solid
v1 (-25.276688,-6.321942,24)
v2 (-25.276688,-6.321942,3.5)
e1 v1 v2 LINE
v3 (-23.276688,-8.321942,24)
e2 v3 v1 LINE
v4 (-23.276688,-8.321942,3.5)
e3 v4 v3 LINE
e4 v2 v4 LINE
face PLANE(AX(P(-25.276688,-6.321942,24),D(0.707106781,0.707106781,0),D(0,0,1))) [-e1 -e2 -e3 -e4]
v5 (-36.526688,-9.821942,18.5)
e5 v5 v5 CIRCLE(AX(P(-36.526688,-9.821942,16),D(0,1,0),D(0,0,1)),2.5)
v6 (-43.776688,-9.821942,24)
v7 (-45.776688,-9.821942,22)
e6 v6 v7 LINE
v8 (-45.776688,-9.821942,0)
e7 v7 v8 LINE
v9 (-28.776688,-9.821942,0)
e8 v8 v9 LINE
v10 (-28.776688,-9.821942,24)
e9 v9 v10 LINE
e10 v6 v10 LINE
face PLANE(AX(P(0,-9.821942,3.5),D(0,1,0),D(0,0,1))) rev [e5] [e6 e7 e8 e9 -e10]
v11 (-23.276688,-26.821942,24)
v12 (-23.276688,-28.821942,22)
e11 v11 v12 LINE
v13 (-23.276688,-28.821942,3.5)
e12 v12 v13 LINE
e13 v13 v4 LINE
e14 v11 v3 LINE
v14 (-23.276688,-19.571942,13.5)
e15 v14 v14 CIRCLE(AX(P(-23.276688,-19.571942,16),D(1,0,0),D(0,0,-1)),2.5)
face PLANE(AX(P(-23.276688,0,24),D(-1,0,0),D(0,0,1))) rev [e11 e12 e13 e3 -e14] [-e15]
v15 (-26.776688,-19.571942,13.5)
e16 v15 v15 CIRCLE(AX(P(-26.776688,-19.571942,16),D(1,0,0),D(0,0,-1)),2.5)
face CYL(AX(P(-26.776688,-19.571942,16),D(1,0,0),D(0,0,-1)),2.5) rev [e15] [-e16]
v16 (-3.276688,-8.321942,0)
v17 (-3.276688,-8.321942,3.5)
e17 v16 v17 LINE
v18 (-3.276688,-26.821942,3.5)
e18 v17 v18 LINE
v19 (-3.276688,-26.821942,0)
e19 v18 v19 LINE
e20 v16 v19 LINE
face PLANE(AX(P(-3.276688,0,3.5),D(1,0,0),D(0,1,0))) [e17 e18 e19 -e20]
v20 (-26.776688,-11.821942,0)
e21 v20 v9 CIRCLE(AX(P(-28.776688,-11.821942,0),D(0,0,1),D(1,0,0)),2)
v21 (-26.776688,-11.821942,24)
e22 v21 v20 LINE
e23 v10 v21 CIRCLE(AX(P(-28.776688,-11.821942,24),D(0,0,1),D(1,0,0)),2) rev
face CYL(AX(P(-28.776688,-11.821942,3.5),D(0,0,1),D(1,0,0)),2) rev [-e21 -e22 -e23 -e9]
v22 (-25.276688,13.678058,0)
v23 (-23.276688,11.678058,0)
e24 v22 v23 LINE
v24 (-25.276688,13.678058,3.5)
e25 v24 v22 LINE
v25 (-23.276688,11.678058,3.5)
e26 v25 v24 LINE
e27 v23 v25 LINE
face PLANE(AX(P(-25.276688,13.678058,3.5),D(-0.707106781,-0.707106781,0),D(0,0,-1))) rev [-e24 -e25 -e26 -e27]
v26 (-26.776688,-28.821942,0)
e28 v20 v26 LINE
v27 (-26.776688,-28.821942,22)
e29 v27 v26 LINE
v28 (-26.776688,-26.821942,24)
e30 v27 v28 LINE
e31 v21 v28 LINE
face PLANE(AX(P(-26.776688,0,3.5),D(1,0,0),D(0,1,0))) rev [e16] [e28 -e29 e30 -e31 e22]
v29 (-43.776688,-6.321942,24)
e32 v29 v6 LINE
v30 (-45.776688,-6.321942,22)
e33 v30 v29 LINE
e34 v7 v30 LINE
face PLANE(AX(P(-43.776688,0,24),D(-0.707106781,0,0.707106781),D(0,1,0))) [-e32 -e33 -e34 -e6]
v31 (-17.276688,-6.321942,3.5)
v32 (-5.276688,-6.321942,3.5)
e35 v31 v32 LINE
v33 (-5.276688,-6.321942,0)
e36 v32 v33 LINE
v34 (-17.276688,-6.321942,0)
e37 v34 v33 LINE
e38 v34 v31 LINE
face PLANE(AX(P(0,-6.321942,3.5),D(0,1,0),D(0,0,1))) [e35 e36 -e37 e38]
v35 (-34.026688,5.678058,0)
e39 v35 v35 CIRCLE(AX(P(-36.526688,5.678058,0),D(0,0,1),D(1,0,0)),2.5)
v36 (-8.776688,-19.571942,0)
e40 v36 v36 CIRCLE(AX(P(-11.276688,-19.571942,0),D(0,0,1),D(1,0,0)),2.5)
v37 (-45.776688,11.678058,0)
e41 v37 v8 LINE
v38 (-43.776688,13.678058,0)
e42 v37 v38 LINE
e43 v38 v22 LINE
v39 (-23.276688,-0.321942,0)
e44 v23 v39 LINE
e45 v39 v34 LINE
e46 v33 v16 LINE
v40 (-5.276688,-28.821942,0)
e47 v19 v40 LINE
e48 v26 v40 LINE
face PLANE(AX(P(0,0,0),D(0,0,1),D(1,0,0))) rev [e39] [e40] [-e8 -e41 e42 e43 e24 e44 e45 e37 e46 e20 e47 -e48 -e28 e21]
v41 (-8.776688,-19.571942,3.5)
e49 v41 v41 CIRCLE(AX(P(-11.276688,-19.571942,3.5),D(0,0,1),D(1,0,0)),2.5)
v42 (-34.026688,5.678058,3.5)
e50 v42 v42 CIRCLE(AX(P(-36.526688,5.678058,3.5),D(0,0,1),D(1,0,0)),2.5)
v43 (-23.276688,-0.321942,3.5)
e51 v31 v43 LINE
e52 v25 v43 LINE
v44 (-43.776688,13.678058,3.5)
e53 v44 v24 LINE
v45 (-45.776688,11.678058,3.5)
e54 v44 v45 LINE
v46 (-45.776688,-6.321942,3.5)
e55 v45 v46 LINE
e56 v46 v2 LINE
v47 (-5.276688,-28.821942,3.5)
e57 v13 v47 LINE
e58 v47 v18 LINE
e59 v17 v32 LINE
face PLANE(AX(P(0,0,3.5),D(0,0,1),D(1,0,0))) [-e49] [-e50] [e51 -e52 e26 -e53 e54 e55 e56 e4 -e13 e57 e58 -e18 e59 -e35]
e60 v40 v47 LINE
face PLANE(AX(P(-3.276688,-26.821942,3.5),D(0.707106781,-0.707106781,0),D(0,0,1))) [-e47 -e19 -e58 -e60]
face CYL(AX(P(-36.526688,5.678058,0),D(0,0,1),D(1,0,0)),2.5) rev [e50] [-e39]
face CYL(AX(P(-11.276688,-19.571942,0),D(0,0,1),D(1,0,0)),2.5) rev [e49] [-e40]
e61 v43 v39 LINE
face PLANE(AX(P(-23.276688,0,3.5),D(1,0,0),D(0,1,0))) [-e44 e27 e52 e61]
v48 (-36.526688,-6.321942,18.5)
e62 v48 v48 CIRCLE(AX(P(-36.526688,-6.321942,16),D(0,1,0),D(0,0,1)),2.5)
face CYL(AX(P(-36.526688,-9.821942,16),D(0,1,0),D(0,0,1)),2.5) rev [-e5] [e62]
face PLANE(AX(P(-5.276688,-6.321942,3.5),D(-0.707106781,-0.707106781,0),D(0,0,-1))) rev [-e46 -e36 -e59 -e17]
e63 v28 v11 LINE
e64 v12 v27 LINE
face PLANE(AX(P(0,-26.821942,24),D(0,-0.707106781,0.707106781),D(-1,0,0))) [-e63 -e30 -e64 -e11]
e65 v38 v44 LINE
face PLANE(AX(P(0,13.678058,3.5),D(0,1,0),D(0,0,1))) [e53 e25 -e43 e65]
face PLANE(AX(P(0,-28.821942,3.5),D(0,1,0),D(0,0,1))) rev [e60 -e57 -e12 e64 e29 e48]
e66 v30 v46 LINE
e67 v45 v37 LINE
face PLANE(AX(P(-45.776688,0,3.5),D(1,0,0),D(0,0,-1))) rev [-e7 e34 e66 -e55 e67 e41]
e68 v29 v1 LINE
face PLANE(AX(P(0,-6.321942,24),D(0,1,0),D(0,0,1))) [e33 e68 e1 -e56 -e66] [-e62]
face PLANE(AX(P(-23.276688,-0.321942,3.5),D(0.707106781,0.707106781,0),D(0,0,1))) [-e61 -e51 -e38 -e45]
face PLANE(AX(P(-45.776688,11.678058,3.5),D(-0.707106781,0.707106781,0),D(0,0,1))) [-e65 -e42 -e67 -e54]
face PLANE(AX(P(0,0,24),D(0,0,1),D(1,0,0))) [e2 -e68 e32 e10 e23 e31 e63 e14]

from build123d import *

# Parameters (mm, degrees)
ESQUISSE1_W             = 3.5
ESQUISSE1_H             = 3.5
BOSS_EXTRU_1_DEPTH      = 3.5
ESQUISSE2_W             = 19
ESQUISSE2_H             = 3.5
ESQUISSE2_W_2           = 3.5
ESQUISSE2_H_2           = 19
BOSS_EXTRU_2_DEPTH      = 20.5
ESQUISSE3_R             = 2.5
ENL_V_MAT_EXTRU_2_DEPTH = 3.5
ESQUISSE4_R             = 2.5
ENL_V_MAT_EXTRU_3_DEPTH = 3.5
ESQUISSE5_R             = 2.5
ENL_V_MAT_EXTRU_4_DEPTH = 3.5
ESQUISSE6_R             = 2.5
ENL_V_MAT_EXTRU_5_DEPTH = 3.5
CHANFREIN1_SIZE         = 6
CHANFREIN2_SIZE         = 2
CHANFREIN3_SIZE         = 2
CONG_1_R                = 2


with BuildPart() as part:
    # Esquisse1 → Boss.-Extru.1 (new body)
    with BuildSketch(Plane.XY):
        Polygon((-23.276688067, 13.678057554), (-45.776688067, 13.678057554), (-45.776688067, -9.821942446), (-26.776688067, -9.821942446), (-26.776688067, -6.321942446), (-23.276688067, -6.321942446), align=None)
        with Locations((-25.026688067, -8.071942446)):
            Rectangle(ESQUISSE1_W, ESQUISSE1_H)
        Polygon((-3.276688067, -6.321942446), (-23.276688067, -6.321942446), (-23.276688067, -9.821942446), (-26.776688067, -9.821942446), (-26.776688067, -28.821942446), (-3.276688067, -28.821942446), align=None)
    extrude(amount=BOSS_EXTRU_1_DEPTH)

    # Esquisse2 → Boss.-Extru.2 (add)
    with BuildSketch(Plane.XY.offset(3.5)):
        with Locations((-36.276688067, -8.071942446)):
            Rectangle(ESQUISSE2_W, ESQUISSE2_H)
        with Locations((-25.026688067, -8.071942446)):
            Rectangle(ESQUISSE2_W_2, ESQUISSE2_H)
        with Locations((-25.026688067, -19.321942446)):
            Rectangle(ESQUISSE2_W_2, ESQUISSE2_H_2)
    extrude(amount=BOSS_EXTRU_2_DEPTH)

    # Esquisse3 → Enlèv. mat.-Extru.2 (cut)
    with BuildSketch(Plane(origin=(0, -6.321942446, 0), x_dir=(1, 0, 0), z_dir=(0, 1, 0))):
        with Locations(Location((-36.526688067, -16, 0), (0, 0, 270))):
            Circle(ESQUISSE3_R)
    extrude(amount=-ENL_V_MAT_EXTRU_2_DEPTH, mode=Mode.SUBTRACT)

    # Esquisse4 → Enlèv. mat.-Extru.3 (cut)
    with BuildSketch(Plane(origin=(-23.276688067, 0, 0), x_dir=(0, 0, -1), z_dir=(1, 0, 0))):
        with Locations((-16, -19.571942446)):
            Circle(ESQUISSE4_R)
    extrude(amount=-ENL_V_MAT_EXTRU_3_DEPTH, mode=Mode.SUBTRACT)

    # Esquisse5 → Enlèv. mat.-Extru.4 (cut)
    with BuildSketch(Plane.XY.offset(3.5)):
        with Locations((-36.526688067, 5.678057554)):
            Circle(ESQUISSE5_R)
    extrude(amount=-ENL_V_MAT_EXTRU_4_DEPTH, mode=Mode.SUBTRACT)

    # Esquisse6 → Enlèv. mat.-Extru.5 (cut)
    with BuildSketch(Plane.XY.offset(3.5)):
        with Locations((-11.276688067, -19.571942446)):
            Circle(ESQUISSE6_R)
    extrude(amount=-ENL_V_MAT_EXTRU_5_DEPTH, mode=Mode.SUBTRACT)

    # Chanfrein1
    # the kernel refuses this chamfer: 6 mm, written as the material it adds along each edge
    with BuildSketch(Plane(origin=(-23.276688067, -6.321942446, 0), x_dir=(-0.027495876610586202, 0.9996219169112968, 0), z_dir=(0, 0, 1))) as chanfrein1_piece_1:
        Polygon((CHANFREIN1_SIZE * 0.999621916911, -CHANFREIN1_SIZE * 0.0274958766106), (-CHANFREIN1_SIZE * 0.0274958766106, -CHANFREIN1_SIZE * 0.999621916911), (0, 0), align=None)
    extrude(amount=3.5)

    # Chanfrein2
    chanfrein2_edges = [part.edges().sort_by_distance(p)[0] for p in [
        (-23.276688067, -6.321942446, 13.75),
    ]]
    chamfer(chanfrein2_edges, length=CHANFREIN2_SIZE)

    # Chanfrein3
    chanfrein3_edges = [part.edges().sort_by_distance(p)[0] for p in [
        (-45.776688067, 13.678057554, 1.75),
        (-23.276688067, 13.678057554, 1.75),
        (-3.276688067, -6.321942446, 1.75),
        (-3.276688067, -28.821942446, 1.75),
        (-25.026688067, -28.821942446, 24),
        (-45.776688067, -8.071942446, 24),
    ]]
    chamfer(chanfrein3_edges, length=CHANFREIN3_SIZE)

    # Congé1
    cong_1_edges = [part.edges().sort_by_distance(p)[0] for p in [
        (-26.776688067, -9.821942446, 12),
    ]]
    fillet(cong_1_edges, radius=CONG_1_R)


solid = part.part
